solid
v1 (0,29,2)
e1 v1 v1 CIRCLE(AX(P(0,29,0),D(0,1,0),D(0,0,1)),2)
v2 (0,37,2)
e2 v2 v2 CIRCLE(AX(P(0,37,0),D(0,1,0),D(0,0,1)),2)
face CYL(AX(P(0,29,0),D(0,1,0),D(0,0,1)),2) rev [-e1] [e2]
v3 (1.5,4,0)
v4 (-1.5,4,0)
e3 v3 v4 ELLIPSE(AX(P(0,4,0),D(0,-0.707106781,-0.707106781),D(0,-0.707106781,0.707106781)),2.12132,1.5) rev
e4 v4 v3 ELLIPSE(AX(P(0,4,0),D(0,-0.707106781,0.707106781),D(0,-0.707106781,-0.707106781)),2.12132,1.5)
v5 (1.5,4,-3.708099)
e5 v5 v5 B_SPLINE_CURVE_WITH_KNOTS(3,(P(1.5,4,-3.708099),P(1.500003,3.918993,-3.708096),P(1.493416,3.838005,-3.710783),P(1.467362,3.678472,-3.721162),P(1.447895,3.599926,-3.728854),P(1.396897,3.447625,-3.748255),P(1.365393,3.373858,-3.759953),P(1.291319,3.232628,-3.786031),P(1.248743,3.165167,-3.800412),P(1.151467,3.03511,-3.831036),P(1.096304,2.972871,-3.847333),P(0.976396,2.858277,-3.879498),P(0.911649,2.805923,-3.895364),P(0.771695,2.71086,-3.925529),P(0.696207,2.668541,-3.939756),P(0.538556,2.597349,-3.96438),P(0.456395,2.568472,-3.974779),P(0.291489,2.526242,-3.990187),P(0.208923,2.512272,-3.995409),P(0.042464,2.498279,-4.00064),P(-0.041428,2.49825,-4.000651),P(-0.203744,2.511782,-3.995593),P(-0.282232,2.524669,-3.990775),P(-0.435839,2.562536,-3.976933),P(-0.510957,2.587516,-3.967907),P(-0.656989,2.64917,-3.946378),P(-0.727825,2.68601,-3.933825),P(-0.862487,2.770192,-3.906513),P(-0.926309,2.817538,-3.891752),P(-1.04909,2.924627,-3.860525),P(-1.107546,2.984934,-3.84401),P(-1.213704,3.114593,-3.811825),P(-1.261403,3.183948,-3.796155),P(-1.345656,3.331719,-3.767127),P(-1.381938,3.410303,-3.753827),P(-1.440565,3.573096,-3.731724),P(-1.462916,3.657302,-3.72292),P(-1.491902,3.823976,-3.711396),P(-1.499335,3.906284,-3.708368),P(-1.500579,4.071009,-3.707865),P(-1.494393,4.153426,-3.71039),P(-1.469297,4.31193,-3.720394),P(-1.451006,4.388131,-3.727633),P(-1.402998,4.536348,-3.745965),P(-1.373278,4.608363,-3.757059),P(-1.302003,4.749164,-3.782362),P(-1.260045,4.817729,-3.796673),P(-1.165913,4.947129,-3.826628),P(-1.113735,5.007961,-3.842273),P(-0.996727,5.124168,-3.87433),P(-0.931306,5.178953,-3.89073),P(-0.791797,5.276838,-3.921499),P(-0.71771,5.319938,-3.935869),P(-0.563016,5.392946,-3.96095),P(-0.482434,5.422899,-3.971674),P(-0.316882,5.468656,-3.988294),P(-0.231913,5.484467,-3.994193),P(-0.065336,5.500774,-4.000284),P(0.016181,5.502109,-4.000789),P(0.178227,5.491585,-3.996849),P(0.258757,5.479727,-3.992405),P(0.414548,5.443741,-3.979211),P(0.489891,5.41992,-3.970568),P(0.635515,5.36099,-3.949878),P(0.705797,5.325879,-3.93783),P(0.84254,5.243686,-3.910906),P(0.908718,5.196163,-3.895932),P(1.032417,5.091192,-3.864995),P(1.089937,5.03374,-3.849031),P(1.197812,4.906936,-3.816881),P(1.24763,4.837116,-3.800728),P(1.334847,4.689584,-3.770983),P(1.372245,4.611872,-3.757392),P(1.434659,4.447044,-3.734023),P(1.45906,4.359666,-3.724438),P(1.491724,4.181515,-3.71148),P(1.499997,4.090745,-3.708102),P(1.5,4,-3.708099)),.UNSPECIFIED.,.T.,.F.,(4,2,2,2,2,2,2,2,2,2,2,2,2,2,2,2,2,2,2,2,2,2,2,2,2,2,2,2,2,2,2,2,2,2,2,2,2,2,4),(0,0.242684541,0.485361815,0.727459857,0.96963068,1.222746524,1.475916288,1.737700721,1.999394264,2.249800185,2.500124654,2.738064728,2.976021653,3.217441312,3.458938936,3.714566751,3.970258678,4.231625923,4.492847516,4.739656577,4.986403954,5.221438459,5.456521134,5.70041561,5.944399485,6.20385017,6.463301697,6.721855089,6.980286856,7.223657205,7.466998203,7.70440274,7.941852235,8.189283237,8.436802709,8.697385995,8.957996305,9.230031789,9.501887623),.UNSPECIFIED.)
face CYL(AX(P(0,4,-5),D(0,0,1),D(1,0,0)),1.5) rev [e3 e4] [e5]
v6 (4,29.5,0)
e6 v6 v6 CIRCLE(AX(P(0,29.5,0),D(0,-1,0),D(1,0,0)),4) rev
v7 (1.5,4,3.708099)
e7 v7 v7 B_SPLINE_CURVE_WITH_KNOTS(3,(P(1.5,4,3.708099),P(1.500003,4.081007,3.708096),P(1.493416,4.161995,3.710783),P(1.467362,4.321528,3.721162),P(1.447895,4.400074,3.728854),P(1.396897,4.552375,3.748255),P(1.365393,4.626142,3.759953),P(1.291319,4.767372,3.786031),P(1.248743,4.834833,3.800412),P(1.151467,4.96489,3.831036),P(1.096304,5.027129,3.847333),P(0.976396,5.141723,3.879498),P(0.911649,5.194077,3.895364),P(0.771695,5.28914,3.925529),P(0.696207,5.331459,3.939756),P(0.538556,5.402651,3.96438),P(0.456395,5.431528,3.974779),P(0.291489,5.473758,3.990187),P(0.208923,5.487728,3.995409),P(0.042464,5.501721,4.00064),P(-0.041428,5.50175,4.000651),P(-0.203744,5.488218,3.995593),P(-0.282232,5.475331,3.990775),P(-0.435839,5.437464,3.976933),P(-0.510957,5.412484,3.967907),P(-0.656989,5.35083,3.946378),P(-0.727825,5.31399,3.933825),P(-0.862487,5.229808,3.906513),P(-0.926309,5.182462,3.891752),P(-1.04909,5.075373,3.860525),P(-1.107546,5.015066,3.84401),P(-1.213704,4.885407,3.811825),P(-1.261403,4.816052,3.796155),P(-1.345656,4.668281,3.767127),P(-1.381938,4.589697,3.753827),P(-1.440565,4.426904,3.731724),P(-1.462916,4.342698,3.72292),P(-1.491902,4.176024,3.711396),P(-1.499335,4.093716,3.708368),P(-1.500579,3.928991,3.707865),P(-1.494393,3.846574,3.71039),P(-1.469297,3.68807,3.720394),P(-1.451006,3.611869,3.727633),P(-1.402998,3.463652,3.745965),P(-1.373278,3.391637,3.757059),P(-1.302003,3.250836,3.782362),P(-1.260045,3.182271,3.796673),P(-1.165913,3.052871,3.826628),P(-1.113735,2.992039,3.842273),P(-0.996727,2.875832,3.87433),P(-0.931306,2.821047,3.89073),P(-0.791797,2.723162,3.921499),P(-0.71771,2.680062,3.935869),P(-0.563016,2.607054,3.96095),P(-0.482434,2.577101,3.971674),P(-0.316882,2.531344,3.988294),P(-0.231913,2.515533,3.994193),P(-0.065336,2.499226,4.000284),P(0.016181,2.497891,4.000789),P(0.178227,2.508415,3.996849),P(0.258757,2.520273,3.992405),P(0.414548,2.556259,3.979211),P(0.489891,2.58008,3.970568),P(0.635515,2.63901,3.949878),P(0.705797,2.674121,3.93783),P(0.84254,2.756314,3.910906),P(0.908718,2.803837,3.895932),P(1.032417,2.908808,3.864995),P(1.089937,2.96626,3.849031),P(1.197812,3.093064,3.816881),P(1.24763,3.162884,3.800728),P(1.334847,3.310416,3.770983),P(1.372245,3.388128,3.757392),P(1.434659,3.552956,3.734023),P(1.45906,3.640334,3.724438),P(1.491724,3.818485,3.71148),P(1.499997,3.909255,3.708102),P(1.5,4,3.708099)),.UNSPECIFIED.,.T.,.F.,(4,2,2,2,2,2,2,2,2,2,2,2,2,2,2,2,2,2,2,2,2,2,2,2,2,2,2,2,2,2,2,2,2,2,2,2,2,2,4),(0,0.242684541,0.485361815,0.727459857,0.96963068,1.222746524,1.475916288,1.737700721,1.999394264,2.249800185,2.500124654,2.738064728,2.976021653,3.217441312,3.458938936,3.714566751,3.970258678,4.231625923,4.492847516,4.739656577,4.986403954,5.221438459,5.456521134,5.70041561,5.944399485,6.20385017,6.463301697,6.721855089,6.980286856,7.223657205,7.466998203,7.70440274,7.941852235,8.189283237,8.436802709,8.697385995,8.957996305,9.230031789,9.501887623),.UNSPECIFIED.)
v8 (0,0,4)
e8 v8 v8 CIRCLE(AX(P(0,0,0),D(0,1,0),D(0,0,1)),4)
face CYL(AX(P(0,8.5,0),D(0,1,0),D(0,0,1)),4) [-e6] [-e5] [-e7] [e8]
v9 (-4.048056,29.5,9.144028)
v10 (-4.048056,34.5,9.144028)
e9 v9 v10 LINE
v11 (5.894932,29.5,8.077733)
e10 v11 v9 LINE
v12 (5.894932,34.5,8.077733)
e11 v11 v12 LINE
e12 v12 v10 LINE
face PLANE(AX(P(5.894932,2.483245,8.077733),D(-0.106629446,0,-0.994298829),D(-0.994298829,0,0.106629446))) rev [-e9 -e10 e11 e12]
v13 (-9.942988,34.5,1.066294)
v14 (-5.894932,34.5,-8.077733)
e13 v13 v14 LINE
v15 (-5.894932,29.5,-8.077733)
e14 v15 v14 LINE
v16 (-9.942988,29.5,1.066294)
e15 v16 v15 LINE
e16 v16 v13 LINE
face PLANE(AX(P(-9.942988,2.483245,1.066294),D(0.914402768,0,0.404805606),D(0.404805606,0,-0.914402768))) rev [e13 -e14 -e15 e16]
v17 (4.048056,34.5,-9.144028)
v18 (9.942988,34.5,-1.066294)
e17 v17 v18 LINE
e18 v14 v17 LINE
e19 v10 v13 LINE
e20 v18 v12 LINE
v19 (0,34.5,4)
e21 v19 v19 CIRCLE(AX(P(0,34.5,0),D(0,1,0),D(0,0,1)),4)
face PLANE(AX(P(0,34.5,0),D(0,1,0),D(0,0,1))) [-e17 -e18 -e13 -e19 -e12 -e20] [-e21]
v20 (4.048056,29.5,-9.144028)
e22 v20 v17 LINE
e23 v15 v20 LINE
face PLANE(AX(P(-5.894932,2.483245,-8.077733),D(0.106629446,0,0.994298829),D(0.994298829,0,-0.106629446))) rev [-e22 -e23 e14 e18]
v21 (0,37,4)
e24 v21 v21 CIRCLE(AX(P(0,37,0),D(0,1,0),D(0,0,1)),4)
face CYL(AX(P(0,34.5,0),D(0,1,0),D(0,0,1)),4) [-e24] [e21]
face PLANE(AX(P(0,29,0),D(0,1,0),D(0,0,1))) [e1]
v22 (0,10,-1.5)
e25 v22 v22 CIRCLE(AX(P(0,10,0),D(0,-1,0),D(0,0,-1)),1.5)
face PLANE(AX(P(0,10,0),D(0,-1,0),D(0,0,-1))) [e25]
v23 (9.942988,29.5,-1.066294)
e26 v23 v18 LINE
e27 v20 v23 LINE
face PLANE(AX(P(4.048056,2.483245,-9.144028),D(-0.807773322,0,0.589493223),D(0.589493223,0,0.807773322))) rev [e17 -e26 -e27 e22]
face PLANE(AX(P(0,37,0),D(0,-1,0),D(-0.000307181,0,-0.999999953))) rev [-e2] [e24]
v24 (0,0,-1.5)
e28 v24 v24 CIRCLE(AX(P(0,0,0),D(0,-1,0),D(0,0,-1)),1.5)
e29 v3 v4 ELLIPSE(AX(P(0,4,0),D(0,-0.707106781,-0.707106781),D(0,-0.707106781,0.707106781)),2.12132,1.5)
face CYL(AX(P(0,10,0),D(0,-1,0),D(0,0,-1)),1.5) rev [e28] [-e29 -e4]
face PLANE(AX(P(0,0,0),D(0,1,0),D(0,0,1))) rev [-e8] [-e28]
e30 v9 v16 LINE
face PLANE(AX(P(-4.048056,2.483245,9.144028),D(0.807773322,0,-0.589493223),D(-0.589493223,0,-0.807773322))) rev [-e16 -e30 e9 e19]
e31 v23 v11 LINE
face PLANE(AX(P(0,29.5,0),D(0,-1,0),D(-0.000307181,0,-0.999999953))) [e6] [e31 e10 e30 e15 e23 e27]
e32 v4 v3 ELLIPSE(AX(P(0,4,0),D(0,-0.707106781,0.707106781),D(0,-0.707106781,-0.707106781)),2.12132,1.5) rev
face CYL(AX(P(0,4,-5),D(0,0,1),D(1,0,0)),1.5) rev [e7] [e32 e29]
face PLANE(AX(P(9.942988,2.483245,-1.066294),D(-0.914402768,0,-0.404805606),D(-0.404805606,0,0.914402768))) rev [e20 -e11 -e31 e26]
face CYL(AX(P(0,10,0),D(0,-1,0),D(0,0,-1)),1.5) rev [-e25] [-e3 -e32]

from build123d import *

# Parameters (mm, degrees)
SKETCH1_R              = 5
BOSS_EXTRUDE1_DEPTH    = 37
SKETCH2_R              = 1.5
CUT_EXTRUDE1_DEPTH     = 10
CUT_EXTRUDE2_OUTLINE_W = 1.5
CUT_EXTRUDE2_OUTLINE_H = 10.000157131
CUT_EXTRUDE3_START     = -28.5
SKETCH3_R              = 5
SKETCH3_R_2            = 4
CUT_EXTRUDE3_DEPTH     = 28.5
SKETCH4_R              = 12
BOSS_EXTRUDE2_DEPTH    = 2.5
BOSS_EXTRUDE3_DEPTH    = 5
SKETCH7_R              = 12
SKETCH7_R_2            = 4
CUT_EXTRUDE4_DEPTH     = 2.5
SKETCH8_R              = 2
CUT_EXTRUDE5_DEPTH     = 8
SKETCH9_R              = 5
SKETCH9_R_2            = 4
CUT_EXTRUDE6_DEPTH     = 32.539281195


# Read off the part's stored shape, not the designer's step: Cut-Extrude2
with BuildPart() as part:
    # Sketch1 → Boss-Extrude1 (new body)
    with BuildSketch(Plane(origin=(0, 0, 0), x_dir=(1, 0, 0), z_dir=(0, 1, 0))):
        Circle(SKETCH1_R)
    extrude(amount=BOSS_EXTRUDE1_DEPTH)

    # Sketch2 → Cut-Extrude1 (cut)
    with BuildSketch(Plane(origin=(0, 0, 0), x_dir=(-1, 0, 0), z_dir=(0, -1, 0))):
        with Locations(Location((0, 0, 0), (0, 0, 90))):
            Circle(SKETCH2_R)
    extrude(amount=-CUT_EXTRUDE1_DEPTH, mode=Mode.SUBTRACT)

    # Cut-Extrude2 outline → Cut-Extrude2 (revolve, cut)
    with BuildSketch(Plane.XZ.offset(-4)):
        with Locations((0.75, -4.8215e-05)):
            Rectangle(CUT_EXTRUDE2_OUTLINE_W, CUT_EXTRUDE2_OUTLINE_H)
    revolve(axis=Axis((0, 4, 0), (0, 0, 1)), mode=Mode.SUBTRACT)

    # Sketch3 → Cut-Extrude3 (cut)
    with BuildSketch(Plane(origin=(0, 37, 0), x_dir=(1, 0, 0), z_dir=(0, 1, 0)).offset(CUT_EXTRUDE3_START)):
        with Locations(Location((0, 0, 0), (0, 0, 270))):
            Circle(SKETCH3_R)
        with Locations(Location((0, 0, 0), (0, 0, 270))):
            Circle(SKETCH3_R_2, mode=Mode.SUBTRACT)
    extrude(amount=CUT_EXTRUDE3_DEPTH, mode=Mode.SUBTRACT)

    # Sketch4 → Boss-Extrude2 (add)
    with BuildSketch(Plane(origin=(0, 37, 0), x_dir=(1, 0, 0), z_dir=(0, 1, 0))):
        with Locations(Location((0, 0, 0), (0, 0, 270))):
            Circle(SKETCH4_R)
    extrude(amount=-BOSS_EXTRUDE2_DEPTH)

    # Sketch6 → Boss-Extrude3 (add)
    with BuildSketch(Plane.XZ.offset(-34.5)):
        Polygon((-4.048056056, 9.144027677), (-9.94298829, 1.066294458), (-5.894932233, -8.077733219), (4.048056056, -9.144027677), (9.94298829, -1.066294458), (5.894932233, 8.077733219), align=None)
    extrude(amount=BOSS_EXTRUDE3_DEPTH)

    # Sketch7 → Cut-Extrude4 (cut)
    with BuildSketch(Plane(origin=(0, 37, 0), x_dir=(1, 0, 0), z_dir=(0, 1, 0))):
        Circle(SKETCH7_R)
        with Locations(Location((0, 0, 0), (0, 0, 270))):
            Circle(SKETCH7_R_2, mode=Mode.SUBTRACT)
    extrude(amount=-CUT_EXTRUDE4_DEPTH, mode=Mode.SUBTRACT)

    # Sketch8 → Cut-Extrude5 (cut)
    with BuildSketch(Plane(origin=(0, 37, 0), x_dir=(1, 0, 0), z_dir=(0, 1, 0))):
        with Locations(Location((0, 0, 0), (0, 0, 270))):
            Circle(SKETCH8_R)
    extrude(amount=-CUT_EXTRUDE5_DEPTH, mode=Mode.SUBTRACT)

    # Sketch9 → Cut-Extrude6 (cut, through all)
    with BuildSketch(Plane(origin=(0, 8.5, 0), x_dir=(1, 0, 0), z_dir=(0, 1, 0))):
        Circle(SKETCH9_R)
        with Locations(Location((0, 0, 0), (0, 0, 270))):
            Circle(SKETCH9_R_2, mode=Mode.SUBTRACT)
    extrude(amount=-CUT_EXTRUDE6_DEPTH, mode=Mode.SUBTRACT)


solid = part.part
